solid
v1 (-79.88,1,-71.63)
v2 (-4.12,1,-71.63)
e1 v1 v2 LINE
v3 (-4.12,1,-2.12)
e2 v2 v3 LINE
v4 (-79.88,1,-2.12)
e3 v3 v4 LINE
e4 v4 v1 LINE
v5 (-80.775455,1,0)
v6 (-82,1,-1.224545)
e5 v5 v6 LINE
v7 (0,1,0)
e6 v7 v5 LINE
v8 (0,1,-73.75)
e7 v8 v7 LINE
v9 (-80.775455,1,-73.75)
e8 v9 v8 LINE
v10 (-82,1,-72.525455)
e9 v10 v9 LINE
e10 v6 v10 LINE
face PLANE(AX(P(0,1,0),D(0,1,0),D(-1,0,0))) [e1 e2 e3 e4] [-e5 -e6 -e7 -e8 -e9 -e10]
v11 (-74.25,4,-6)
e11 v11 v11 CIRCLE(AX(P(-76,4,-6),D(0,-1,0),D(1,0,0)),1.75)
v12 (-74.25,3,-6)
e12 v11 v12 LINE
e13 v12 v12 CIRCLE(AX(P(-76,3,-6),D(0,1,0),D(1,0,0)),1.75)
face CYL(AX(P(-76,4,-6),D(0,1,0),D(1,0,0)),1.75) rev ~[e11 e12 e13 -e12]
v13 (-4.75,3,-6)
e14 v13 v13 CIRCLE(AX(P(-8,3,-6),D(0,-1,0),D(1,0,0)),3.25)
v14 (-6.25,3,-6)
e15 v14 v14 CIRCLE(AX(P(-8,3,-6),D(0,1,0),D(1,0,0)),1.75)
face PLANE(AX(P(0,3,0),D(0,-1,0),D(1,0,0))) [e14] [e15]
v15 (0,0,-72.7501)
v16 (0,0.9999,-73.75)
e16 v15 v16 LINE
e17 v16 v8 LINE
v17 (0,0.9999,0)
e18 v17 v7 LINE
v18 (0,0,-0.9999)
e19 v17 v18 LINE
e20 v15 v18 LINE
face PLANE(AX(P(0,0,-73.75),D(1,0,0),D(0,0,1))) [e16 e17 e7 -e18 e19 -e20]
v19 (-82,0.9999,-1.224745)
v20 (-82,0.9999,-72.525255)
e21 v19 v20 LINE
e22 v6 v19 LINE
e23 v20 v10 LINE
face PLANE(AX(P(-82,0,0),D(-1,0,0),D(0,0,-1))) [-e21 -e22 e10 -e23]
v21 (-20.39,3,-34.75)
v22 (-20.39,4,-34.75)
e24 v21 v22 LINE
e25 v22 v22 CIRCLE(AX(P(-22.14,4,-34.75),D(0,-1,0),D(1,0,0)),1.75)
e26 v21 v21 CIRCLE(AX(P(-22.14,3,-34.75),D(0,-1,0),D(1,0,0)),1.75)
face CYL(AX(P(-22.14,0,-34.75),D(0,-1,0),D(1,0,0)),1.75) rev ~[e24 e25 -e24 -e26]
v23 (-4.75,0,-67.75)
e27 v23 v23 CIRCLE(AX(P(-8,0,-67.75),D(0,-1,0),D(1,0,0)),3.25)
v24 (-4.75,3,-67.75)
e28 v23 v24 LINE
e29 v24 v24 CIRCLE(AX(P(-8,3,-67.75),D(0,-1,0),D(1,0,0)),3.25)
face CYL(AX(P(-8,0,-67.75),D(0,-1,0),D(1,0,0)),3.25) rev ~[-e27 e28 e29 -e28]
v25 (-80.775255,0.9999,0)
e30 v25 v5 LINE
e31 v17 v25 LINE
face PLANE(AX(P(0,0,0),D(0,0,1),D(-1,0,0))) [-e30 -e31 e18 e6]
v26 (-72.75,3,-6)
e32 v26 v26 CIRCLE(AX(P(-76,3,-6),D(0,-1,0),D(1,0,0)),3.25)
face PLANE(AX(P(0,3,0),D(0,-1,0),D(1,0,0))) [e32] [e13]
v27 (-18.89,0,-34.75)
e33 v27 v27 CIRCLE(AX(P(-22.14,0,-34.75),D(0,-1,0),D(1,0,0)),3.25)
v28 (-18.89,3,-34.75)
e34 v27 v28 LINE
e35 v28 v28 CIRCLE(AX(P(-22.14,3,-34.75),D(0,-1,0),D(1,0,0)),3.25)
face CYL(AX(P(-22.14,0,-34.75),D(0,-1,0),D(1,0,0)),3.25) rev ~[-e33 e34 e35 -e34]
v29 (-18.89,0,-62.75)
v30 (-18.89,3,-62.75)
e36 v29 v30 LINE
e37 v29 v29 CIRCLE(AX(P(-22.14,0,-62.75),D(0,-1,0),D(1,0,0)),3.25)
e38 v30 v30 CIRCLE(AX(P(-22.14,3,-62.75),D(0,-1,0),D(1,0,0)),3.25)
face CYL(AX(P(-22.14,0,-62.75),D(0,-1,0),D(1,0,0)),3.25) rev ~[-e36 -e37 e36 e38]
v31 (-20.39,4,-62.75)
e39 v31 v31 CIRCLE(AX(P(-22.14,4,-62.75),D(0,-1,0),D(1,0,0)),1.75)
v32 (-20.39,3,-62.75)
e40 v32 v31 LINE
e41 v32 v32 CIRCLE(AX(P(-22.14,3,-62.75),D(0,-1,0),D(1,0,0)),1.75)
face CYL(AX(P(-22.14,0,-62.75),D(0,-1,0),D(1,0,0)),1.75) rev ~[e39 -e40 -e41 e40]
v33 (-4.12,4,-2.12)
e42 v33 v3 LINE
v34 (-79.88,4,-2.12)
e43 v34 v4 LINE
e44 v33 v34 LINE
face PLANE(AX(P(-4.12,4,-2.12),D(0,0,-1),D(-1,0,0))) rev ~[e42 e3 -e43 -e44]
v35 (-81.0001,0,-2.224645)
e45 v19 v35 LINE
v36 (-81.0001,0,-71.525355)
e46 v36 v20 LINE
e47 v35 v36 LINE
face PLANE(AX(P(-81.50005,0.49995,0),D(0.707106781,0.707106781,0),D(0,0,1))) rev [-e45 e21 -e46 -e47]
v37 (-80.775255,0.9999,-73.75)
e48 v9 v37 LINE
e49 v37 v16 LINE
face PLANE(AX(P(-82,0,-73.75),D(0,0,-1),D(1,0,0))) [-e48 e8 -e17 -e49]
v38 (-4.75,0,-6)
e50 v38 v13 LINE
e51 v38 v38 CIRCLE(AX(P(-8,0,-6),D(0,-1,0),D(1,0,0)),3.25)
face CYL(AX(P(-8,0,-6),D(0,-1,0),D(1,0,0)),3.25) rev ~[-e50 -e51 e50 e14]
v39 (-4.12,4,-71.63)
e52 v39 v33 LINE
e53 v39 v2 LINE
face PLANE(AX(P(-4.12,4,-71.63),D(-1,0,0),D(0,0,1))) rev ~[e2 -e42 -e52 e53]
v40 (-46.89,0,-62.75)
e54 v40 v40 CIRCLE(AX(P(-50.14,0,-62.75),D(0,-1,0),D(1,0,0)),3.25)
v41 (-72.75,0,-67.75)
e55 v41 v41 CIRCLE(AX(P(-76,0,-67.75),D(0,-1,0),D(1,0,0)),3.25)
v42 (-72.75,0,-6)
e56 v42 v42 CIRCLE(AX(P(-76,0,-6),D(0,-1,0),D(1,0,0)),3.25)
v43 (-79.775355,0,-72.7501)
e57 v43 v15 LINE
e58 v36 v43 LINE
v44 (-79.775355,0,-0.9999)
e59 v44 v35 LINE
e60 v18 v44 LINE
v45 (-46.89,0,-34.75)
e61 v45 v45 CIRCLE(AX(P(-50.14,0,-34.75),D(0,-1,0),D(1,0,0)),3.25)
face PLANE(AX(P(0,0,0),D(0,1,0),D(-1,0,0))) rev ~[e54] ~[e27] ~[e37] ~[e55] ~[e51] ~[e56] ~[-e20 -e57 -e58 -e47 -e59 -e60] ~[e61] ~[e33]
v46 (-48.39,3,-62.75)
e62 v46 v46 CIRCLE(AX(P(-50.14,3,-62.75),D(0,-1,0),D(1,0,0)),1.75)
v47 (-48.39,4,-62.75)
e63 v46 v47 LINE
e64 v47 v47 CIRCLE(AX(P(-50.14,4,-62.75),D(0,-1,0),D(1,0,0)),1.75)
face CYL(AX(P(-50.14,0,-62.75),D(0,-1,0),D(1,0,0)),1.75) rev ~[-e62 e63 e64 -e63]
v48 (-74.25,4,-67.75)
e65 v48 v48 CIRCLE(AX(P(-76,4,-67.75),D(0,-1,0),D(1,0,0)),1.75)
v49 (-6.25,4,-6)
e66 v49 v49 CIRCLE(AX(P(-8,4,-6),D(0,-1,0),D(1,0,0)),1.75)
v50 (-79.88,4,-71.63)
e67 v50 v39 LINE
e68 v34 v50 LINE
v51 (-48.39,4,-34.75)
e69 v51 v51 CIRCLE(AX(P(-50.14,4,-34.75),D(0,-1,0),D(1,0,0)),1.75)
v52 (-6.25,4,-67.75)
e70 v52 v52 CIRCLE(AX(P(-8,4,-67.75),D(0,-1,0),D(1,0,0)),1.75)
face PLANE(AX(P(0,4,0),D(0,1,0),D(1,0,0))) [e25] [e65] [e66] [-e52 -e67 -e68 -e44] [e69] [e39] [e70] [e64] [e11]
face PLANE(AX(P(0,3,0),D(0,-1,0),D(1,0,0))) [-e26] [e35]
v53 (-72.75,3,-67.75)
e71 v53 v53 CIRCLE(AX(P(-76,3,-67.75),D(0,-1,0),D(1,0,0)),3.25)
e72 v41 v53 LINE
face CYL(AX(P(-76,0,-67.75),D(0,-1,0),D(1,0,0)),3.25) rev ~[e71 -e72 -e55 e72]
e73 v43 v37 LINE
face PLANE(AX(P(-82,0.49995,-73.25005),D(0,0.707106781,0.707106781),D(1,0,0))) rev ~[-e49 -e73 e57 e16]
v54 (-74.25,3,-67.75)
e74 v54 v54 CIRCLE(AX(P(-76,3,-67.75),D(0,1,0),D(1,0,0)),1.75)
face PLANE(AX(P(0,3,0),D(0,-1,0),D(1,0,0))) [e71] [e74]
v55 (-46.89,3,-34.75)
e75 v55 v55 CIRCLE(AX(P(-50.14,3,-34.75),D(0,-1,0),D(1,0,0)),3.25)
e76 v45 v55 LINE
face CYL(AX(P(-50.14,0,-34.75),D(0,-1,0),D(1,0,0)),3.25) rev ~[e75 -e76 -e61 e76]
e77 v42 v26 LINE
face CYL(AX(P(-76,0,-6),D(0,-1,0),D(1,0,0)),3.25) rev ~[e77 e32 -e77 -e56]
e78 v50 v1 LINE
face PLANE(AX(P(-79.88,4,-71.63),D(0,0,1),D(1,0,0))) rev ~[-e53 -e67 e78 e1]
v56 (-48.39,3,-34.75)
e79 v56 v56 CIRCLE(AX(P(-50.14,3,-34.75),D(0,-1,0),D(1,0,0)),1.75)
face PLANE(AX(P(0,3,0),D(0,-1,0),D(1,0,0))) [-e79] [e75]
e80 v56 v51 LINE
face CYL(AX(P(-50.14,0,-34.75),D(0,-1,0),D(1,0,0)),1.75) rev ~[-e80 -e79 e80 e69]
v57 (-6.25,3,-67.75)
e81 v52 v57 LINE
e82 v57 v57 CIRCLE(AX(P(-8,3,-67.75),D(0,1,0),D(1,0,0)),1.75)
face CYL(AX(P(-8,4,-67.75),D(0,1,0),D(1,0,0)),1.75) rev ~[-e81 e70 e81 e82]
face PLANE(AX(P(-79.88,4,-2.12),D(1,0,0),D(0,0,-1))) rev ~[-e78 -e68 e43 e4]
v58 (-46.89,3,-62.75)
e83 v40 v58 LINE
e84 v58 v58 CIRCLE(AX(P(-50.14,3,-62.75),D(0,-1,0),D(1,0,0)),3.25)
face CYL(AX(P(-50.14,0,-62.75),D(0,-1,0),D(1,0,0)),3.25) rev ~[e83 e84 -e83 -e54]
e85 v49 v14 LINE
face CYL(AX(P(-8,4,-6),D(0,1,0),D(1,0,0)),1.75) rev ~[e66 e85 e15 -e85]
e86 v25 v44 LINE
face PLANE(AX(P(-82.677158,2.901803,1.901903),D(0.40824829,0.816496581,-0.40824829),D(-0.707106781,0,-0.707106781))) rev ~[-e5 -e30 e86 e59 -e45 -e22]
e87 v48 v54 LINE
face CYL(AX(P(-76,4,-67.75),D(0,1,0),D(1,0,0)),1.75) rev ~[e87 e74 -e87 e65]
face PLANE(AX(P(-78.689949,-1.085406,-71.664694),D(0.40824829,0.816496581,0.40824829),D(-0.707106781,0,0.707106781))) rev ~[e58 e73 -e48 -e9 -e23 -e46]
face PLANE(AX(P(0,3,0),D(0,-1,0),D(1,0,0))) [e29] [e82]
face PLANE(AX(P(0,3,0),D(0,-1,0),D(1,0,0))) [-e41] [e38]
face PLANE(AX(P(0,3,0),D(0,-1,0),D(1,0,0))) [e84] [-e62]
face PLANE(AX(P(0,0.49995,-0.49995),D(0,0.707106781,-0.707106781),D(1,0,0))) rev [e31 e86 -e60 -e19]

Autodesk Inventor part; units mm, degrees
ref_plane "YZ Plane" through (0, 0, 0) normal (1, 0, 0) x (0, 1, 0)
ref_plane "XZ Plane" through (0, 0, 0) normal (0, 1, 0) x (-1, 0, 0)
ref_plane "XY Plane" through (0, 0, 0) normal (0, 0, 1) x (1, 0, 0)
sketch "Sketch1" plane through (0, 0, 0) normal (0, 1, 0) x (-1, 0, 0)
  line L0 (0, 0) -> (82, 0)
  line L1 (82, 0) -> (82, -73.75)
  line L2 (82, -73.75) -> (0, -73.75)
  line L3 (0, -73.75) -> (0, 0)
  dimension "d0" = 82
  dimension "d1" = 73.75
extrude "Extrusion1" add sketch "Sketch1" along normal blind 1
sketch "Sketch2" plane through (0, 1, 0) normal (0, 1, 0) x (1, 0, 0)
  line L0 (-82, 0) -> (0, 0) projected
  line L1 (0, 0) -> (-4, 0)
  line L2 (-4, 0) -> (-4, 2)
  line L3 (-4, 2) -> (0, 2)
  line L4 (0, 2) -> (0, 0)
  line L5 (0, 73.75) -> (-82, 73.75) projected
  line L6 (0, 73.75) -> (-4, 73.75)
  line L7 (-4, 73.75) -> (-4, 71.75)
  line L8 (-4, 71.75) -> (0, 71.75)
  line L9 (0, 71.75) -> (0, 73.75)
  line L10 (0, 73.75) -> (-82, 73.75)
  line L11 (-82, 0) -> (-80, 0)
  line L12 (-80, 0) -> (-80, 2)
  line L13 (-80, 2) -> (-82, 2)
  line L14 (-82, 2) -> (-82, 0)
  line L15 (-82, 73.75) -> (-82, 0) projected
  line L16 (-82, 73.75) -> (-80, 73.75)
  line L17 (-80, 73.75) -> (-80, 71.75)
  line L18 (-80, 71.75) -> (-82, 71.75)
  line L19 (-82, 71.75) -> (-82, 73.75)
  line L20 (-4, 2) -> (-80, 2)
  line L21 (-80, 2) -> (-80, 71.75)
  line L22 (-80, 71.75) -> (-4, 71.75)
  line L23 (-4, 71.75) -> (-4, 2)
  dimension "d4" = 4
  dimension "d5" = 2
  dimension "d6" = 4
  dimension "d7" = 2
  dimension "d8" = 2
  dimension "d9" = 2
  dimension "d10" = 2
  dimension "d11" = 2
extrude "Extrusion2" add sketch "Sketch2" along normal blind 3 contours L21 L22 L23 L20
sketch "Sketch3" plane through (0, 0, 0) normal (0, -1, 0) x (1, 0, 0)
  line L0 (-82, -73.75) -> (-82, 0) projected
  line L1 (-82, -73.75) -> (-50.14, -73.75)
  line L2 (-50.14, -73.75) -> (-50.14, -62.75)
  line L3 (-50.14, -62.75) -> (-82, -62.75)
  line L4 (-82, -62.75) -> (-82, -73.75)
  line L5 (-50.14, -62.75) -> (-22.14, -62.75)
  line L6 (-22.14, -62.75) -> (-22.14, -34.75)
  line L7 (-22.14, -34.75) -> (-50.14, -34.75)
  line L8 (-50.14, -34.75) -> (-50.14, -62.75)
  circle A0 centre (-22.14, -62.75) radius 1.75
  circle A1 centre (-22.14, -34.75) radius 1.75
  circle A2 centre (-50.14, -34.75) radius 1.75
  circle A3 centre (-50.14, -62.75) radius 1.75
  point P0 (0, 0)
  point P1 (-48.39, -62.75)
  point P2 (-50.14, -61)
  point P3 (-51.89, -62.75)
  point P4 (-50.14, -64.5)
  point P5 (-23.89, -62.75)
  point P6 (-22.14, -61)
  point P7 (-22.14, -36.5)
  point P8 (-23.89, -34.75)
  point P9 (-48.39, -34.75)
  point P10 (-50.14, -36.5)
  dimension "d14" = 31.86
  dimension "d15" = 11
  dimension "d16" = 28
  dimension "d17" = 28
  dimension "d18" = 3.5
  dimension "d19" = 3.5
  dimension "d20" = 3.5
  dimension "d21" = 3.5
extrude "Extrusion3" cut sketch "Sketch3" against normal blind 5 contours A3 L8 L3 | L3 L2 A3 | L2 L5 A3 | L8 A3 L5 | A2 L7 L8 | L8 L7 A2 | A0 L6 L5 | L5 L6 A0 | A1 L6 L7 | L7 L6 A1
sketch "Sketch4" plane through (0, 0, 0) normal (0, -1, 0) x (1, 0, 0)
  circle A0 centre (-22.14, -62.75) radius 1.75 projected
  circle A1 centre (-22.14, -62.75) radius 3.25
  circle A2 centre (-50.14, -62.75) radius 1.75 projected
  circle A3 centre (-50.14, -62.75) radius 3.25
  circle A4 centre (-50.14, -34.75) radius 1.75 projected
  circle A5 centre (-50.14, -34.75) radius 3.25
  circle A6 centre (-22.14, -34.75) radius 1.75 projected
  circle A7 centre (-22.14, -34.75) radius 3.25
  point P0 (0, 0)
  dimension "d24" = 6.5
  dimension "d25" = 6.5
  dimension "d26" = 6.5
  dimension "d27" = 6.5
extrude "Extrusion4" cut sketch "Sketch4" against normal blind 3
sketch "Sketch5" plane through (0, 4, 0) normal (0, 1, 0) x (1, 0, 0)
  line L0 (-4, 71.75) -> (-80, 71.75) projected
  line L1 (-80, 71.75) -> (-76, 71.75)
  line L2 (-80, 71.75) -> (-76, 71.75)
  line L3 (-76, 71.75) -> (-76, 67.75)
  line L4 (-76, 67.75) -> (-80, 67.75)
  line L5 (-80, 67.75) -> (-80, 71.75)
  line L6 (-4, 71.75) -> (-8, 71.75)
  line L7 (-8, 71.75) -> (-8, 67.75)
  line L8 (-8, 67.75) -> (-4, 67.75)
  line L9 (-4, 67.75) -> (-4, 71.75)
  line L10 (-80, 2) -> (-4, 2) projected
  line L11 (-4, 2) -> (-8, 2)
  line L12 (-8, 2) -> (-8, 6)
  line L13 (-8, 6) -> (-4, 6)
  line L14 (-4, 6) -> (-4, 2)
  line L15 (-80, 2) -> (-76, 2)
  line L16 (-76, 2) -> (-76, 6)
  line L17 (-76, 6) -> (-80, 6)
  line L18 (-80, 6) -> (-80, 2)
  circle A0 centre (-76, 67.75) radius 1.75
  circle A1 centre (-8, 67.75) radius 1.75
  circle A2 centre (-8, 6) radius 1.75
  circle A3 centre (-76, 6) radius 1.75
  point P0 (0, 0)
  dimension "d30" = 4
  dimension "d31" = 4
  dimension "d32" = 4
  dimension "d33" = 4
  dimension "d34" = 4
  dimension "d35" = 4
  dimension "d36" = 4
  dimension "d37" = 4
  dimension "d38" = 4
  dimension "d39" = 3.5
  dimension "d40" = 3.5
  dimension "d41" = 3.5
  dimension "d42" = 3.5
extrude "Extrusion5" cut sketch "Sketch5" against normal blind 5 contours A1 L8 L7 | L7 L8 A1 | A0 L4 L3 | L3 L4 A0 | A3 L17 L16 | L16 L17 A3 | A2 L13 L12 | L12 L13 A2
sketch "Sketch6" plane through (0, 0, 0) normal (0, -1, 0) x (1, 0, 0)
  circle A0 centre (-8, -67.75) radius 1.75 projected
  circle A1 centre (-8, -67.75) radius 3.25
  circle A2 centre (-76, -67.75) radius 1.75 projected
  circle A3 centre (-76, -67.75) radius 3.25
  circle A4 centre (-76, -6) radius 1.75 projected
  circle A5 centre (-76, -6) radius 3.25
  circle A6 centre (-8, -6) radius 1.75 projected
  circle A7 centre (-8, -6) radius 3.25
  point P0 (0, 0)
  dimension "d45" = 6.5
  dimension "d46" = 6.5
  dimension "d47" = 6.5
  dimension "d48" = 6.5
extrude "Extrusion6" cut sketch "Sketch6" against normal blind 3 contours A0 | A1 | A2 | A3 | A4 | A5 | A6 | A7
sketch "Sketch7" plane through (0, 4, 0) normal (0, 1, 0) x (1, 0, 0)
  line L0 (-4, 2) -> (-4, 71.75) projected
  line L1 (-4, 2) -> (-4.12, 2)
  line L2 (-4.12, 2) -> (-4.12, 2.12)
  line L3 (-4.12, 2.12) -> (-4, 2.12)
  line L4 (-4, 2.12) -> (-4, 2)
  line L5 (-80, 71.75) -> (-4, 71.75) projected
  line L6 (-80, 71.75) -> (-79.88, 71.75)
  line L7 (-79.88, 71.75) -> (-79.88, 71.63)
  line L8 (-79.88, 71.63) -> (-80, 71.63)
  line L9 (-80, 71.63) -> (-80, 71.75)
  line L10 (-79.88, 71.63) -> (-4, 71.63)
  line L11 (-4, 71.63) -> (-4, 71.75)
  line L12 (-4, 71.75) -> (-79.88, 71.75)
  line L13 (-79.88, 71.75) -> (-79.88, 71.63)
  line L14 (-4.12, 2) -> (-4, 2)
  line L15 (-4, 2) -> (-4, 71.75)
  line L16 (-4, 71.75) -> (-4.12, 71.75)
  line L17 (-4.12, 71.75) -> (-4.12, 2)
  line L18 (-80, 2) -> (-4, 2) projected
  line L19 (-4.12, 2.12) -> (-80, 2.12)
  line L20 (-80, 2.12) -> (-80, 2)
  line L21 (-80, 2) -> (-4.12, 2)
  line L22 (-4.12, 2) -> (-4.12, 2.12)
  line L23 (-80, 2) -> (-79.88, 2)
  line L24 (-79.88, 2) -> (-79.88, 71.63)
  line L25 (-79.88, 71.63) -> (-80, 71.63)
  line L26 (-80, 71.63) -> (-80, 2)
  point P0 (0, 0)
  point P1 (-4.12, 2.12)
  point P2 (-79.88, 2.12)
  point P3 (-4.12, 71.63)
  dimension "d51" = 0.12
  dimension "d52" = 0.12
  dimension "d53" = 0.12
  dimension "d54" = 0.12
extrude "Extrusion7" cut sketch "Sketch7" against normal blind 3 contours L1 L2 L3 L0 | L3 L17 L10 L0 | L18 L24 L19 L2 | L10 L17 L5 L0 | L18 L20 L19 L24 | L10 L7 L5 L17 | L19 L26 L8 L24 | L8 L9 L5 L7
chamfer "Chamfer1" distance 1 angle 45 3 edges at (-41, 0, -73.75) (-82, 0, -36.875) (-41, 0, 0)
chamfer "Chamfer2" distance 1 angle 45 2 edges at (-81.5001, 0.4999, -73.2501) (-81.5001, 0.4999, -0.4999)
properties part number "Electronics Box Lid"
